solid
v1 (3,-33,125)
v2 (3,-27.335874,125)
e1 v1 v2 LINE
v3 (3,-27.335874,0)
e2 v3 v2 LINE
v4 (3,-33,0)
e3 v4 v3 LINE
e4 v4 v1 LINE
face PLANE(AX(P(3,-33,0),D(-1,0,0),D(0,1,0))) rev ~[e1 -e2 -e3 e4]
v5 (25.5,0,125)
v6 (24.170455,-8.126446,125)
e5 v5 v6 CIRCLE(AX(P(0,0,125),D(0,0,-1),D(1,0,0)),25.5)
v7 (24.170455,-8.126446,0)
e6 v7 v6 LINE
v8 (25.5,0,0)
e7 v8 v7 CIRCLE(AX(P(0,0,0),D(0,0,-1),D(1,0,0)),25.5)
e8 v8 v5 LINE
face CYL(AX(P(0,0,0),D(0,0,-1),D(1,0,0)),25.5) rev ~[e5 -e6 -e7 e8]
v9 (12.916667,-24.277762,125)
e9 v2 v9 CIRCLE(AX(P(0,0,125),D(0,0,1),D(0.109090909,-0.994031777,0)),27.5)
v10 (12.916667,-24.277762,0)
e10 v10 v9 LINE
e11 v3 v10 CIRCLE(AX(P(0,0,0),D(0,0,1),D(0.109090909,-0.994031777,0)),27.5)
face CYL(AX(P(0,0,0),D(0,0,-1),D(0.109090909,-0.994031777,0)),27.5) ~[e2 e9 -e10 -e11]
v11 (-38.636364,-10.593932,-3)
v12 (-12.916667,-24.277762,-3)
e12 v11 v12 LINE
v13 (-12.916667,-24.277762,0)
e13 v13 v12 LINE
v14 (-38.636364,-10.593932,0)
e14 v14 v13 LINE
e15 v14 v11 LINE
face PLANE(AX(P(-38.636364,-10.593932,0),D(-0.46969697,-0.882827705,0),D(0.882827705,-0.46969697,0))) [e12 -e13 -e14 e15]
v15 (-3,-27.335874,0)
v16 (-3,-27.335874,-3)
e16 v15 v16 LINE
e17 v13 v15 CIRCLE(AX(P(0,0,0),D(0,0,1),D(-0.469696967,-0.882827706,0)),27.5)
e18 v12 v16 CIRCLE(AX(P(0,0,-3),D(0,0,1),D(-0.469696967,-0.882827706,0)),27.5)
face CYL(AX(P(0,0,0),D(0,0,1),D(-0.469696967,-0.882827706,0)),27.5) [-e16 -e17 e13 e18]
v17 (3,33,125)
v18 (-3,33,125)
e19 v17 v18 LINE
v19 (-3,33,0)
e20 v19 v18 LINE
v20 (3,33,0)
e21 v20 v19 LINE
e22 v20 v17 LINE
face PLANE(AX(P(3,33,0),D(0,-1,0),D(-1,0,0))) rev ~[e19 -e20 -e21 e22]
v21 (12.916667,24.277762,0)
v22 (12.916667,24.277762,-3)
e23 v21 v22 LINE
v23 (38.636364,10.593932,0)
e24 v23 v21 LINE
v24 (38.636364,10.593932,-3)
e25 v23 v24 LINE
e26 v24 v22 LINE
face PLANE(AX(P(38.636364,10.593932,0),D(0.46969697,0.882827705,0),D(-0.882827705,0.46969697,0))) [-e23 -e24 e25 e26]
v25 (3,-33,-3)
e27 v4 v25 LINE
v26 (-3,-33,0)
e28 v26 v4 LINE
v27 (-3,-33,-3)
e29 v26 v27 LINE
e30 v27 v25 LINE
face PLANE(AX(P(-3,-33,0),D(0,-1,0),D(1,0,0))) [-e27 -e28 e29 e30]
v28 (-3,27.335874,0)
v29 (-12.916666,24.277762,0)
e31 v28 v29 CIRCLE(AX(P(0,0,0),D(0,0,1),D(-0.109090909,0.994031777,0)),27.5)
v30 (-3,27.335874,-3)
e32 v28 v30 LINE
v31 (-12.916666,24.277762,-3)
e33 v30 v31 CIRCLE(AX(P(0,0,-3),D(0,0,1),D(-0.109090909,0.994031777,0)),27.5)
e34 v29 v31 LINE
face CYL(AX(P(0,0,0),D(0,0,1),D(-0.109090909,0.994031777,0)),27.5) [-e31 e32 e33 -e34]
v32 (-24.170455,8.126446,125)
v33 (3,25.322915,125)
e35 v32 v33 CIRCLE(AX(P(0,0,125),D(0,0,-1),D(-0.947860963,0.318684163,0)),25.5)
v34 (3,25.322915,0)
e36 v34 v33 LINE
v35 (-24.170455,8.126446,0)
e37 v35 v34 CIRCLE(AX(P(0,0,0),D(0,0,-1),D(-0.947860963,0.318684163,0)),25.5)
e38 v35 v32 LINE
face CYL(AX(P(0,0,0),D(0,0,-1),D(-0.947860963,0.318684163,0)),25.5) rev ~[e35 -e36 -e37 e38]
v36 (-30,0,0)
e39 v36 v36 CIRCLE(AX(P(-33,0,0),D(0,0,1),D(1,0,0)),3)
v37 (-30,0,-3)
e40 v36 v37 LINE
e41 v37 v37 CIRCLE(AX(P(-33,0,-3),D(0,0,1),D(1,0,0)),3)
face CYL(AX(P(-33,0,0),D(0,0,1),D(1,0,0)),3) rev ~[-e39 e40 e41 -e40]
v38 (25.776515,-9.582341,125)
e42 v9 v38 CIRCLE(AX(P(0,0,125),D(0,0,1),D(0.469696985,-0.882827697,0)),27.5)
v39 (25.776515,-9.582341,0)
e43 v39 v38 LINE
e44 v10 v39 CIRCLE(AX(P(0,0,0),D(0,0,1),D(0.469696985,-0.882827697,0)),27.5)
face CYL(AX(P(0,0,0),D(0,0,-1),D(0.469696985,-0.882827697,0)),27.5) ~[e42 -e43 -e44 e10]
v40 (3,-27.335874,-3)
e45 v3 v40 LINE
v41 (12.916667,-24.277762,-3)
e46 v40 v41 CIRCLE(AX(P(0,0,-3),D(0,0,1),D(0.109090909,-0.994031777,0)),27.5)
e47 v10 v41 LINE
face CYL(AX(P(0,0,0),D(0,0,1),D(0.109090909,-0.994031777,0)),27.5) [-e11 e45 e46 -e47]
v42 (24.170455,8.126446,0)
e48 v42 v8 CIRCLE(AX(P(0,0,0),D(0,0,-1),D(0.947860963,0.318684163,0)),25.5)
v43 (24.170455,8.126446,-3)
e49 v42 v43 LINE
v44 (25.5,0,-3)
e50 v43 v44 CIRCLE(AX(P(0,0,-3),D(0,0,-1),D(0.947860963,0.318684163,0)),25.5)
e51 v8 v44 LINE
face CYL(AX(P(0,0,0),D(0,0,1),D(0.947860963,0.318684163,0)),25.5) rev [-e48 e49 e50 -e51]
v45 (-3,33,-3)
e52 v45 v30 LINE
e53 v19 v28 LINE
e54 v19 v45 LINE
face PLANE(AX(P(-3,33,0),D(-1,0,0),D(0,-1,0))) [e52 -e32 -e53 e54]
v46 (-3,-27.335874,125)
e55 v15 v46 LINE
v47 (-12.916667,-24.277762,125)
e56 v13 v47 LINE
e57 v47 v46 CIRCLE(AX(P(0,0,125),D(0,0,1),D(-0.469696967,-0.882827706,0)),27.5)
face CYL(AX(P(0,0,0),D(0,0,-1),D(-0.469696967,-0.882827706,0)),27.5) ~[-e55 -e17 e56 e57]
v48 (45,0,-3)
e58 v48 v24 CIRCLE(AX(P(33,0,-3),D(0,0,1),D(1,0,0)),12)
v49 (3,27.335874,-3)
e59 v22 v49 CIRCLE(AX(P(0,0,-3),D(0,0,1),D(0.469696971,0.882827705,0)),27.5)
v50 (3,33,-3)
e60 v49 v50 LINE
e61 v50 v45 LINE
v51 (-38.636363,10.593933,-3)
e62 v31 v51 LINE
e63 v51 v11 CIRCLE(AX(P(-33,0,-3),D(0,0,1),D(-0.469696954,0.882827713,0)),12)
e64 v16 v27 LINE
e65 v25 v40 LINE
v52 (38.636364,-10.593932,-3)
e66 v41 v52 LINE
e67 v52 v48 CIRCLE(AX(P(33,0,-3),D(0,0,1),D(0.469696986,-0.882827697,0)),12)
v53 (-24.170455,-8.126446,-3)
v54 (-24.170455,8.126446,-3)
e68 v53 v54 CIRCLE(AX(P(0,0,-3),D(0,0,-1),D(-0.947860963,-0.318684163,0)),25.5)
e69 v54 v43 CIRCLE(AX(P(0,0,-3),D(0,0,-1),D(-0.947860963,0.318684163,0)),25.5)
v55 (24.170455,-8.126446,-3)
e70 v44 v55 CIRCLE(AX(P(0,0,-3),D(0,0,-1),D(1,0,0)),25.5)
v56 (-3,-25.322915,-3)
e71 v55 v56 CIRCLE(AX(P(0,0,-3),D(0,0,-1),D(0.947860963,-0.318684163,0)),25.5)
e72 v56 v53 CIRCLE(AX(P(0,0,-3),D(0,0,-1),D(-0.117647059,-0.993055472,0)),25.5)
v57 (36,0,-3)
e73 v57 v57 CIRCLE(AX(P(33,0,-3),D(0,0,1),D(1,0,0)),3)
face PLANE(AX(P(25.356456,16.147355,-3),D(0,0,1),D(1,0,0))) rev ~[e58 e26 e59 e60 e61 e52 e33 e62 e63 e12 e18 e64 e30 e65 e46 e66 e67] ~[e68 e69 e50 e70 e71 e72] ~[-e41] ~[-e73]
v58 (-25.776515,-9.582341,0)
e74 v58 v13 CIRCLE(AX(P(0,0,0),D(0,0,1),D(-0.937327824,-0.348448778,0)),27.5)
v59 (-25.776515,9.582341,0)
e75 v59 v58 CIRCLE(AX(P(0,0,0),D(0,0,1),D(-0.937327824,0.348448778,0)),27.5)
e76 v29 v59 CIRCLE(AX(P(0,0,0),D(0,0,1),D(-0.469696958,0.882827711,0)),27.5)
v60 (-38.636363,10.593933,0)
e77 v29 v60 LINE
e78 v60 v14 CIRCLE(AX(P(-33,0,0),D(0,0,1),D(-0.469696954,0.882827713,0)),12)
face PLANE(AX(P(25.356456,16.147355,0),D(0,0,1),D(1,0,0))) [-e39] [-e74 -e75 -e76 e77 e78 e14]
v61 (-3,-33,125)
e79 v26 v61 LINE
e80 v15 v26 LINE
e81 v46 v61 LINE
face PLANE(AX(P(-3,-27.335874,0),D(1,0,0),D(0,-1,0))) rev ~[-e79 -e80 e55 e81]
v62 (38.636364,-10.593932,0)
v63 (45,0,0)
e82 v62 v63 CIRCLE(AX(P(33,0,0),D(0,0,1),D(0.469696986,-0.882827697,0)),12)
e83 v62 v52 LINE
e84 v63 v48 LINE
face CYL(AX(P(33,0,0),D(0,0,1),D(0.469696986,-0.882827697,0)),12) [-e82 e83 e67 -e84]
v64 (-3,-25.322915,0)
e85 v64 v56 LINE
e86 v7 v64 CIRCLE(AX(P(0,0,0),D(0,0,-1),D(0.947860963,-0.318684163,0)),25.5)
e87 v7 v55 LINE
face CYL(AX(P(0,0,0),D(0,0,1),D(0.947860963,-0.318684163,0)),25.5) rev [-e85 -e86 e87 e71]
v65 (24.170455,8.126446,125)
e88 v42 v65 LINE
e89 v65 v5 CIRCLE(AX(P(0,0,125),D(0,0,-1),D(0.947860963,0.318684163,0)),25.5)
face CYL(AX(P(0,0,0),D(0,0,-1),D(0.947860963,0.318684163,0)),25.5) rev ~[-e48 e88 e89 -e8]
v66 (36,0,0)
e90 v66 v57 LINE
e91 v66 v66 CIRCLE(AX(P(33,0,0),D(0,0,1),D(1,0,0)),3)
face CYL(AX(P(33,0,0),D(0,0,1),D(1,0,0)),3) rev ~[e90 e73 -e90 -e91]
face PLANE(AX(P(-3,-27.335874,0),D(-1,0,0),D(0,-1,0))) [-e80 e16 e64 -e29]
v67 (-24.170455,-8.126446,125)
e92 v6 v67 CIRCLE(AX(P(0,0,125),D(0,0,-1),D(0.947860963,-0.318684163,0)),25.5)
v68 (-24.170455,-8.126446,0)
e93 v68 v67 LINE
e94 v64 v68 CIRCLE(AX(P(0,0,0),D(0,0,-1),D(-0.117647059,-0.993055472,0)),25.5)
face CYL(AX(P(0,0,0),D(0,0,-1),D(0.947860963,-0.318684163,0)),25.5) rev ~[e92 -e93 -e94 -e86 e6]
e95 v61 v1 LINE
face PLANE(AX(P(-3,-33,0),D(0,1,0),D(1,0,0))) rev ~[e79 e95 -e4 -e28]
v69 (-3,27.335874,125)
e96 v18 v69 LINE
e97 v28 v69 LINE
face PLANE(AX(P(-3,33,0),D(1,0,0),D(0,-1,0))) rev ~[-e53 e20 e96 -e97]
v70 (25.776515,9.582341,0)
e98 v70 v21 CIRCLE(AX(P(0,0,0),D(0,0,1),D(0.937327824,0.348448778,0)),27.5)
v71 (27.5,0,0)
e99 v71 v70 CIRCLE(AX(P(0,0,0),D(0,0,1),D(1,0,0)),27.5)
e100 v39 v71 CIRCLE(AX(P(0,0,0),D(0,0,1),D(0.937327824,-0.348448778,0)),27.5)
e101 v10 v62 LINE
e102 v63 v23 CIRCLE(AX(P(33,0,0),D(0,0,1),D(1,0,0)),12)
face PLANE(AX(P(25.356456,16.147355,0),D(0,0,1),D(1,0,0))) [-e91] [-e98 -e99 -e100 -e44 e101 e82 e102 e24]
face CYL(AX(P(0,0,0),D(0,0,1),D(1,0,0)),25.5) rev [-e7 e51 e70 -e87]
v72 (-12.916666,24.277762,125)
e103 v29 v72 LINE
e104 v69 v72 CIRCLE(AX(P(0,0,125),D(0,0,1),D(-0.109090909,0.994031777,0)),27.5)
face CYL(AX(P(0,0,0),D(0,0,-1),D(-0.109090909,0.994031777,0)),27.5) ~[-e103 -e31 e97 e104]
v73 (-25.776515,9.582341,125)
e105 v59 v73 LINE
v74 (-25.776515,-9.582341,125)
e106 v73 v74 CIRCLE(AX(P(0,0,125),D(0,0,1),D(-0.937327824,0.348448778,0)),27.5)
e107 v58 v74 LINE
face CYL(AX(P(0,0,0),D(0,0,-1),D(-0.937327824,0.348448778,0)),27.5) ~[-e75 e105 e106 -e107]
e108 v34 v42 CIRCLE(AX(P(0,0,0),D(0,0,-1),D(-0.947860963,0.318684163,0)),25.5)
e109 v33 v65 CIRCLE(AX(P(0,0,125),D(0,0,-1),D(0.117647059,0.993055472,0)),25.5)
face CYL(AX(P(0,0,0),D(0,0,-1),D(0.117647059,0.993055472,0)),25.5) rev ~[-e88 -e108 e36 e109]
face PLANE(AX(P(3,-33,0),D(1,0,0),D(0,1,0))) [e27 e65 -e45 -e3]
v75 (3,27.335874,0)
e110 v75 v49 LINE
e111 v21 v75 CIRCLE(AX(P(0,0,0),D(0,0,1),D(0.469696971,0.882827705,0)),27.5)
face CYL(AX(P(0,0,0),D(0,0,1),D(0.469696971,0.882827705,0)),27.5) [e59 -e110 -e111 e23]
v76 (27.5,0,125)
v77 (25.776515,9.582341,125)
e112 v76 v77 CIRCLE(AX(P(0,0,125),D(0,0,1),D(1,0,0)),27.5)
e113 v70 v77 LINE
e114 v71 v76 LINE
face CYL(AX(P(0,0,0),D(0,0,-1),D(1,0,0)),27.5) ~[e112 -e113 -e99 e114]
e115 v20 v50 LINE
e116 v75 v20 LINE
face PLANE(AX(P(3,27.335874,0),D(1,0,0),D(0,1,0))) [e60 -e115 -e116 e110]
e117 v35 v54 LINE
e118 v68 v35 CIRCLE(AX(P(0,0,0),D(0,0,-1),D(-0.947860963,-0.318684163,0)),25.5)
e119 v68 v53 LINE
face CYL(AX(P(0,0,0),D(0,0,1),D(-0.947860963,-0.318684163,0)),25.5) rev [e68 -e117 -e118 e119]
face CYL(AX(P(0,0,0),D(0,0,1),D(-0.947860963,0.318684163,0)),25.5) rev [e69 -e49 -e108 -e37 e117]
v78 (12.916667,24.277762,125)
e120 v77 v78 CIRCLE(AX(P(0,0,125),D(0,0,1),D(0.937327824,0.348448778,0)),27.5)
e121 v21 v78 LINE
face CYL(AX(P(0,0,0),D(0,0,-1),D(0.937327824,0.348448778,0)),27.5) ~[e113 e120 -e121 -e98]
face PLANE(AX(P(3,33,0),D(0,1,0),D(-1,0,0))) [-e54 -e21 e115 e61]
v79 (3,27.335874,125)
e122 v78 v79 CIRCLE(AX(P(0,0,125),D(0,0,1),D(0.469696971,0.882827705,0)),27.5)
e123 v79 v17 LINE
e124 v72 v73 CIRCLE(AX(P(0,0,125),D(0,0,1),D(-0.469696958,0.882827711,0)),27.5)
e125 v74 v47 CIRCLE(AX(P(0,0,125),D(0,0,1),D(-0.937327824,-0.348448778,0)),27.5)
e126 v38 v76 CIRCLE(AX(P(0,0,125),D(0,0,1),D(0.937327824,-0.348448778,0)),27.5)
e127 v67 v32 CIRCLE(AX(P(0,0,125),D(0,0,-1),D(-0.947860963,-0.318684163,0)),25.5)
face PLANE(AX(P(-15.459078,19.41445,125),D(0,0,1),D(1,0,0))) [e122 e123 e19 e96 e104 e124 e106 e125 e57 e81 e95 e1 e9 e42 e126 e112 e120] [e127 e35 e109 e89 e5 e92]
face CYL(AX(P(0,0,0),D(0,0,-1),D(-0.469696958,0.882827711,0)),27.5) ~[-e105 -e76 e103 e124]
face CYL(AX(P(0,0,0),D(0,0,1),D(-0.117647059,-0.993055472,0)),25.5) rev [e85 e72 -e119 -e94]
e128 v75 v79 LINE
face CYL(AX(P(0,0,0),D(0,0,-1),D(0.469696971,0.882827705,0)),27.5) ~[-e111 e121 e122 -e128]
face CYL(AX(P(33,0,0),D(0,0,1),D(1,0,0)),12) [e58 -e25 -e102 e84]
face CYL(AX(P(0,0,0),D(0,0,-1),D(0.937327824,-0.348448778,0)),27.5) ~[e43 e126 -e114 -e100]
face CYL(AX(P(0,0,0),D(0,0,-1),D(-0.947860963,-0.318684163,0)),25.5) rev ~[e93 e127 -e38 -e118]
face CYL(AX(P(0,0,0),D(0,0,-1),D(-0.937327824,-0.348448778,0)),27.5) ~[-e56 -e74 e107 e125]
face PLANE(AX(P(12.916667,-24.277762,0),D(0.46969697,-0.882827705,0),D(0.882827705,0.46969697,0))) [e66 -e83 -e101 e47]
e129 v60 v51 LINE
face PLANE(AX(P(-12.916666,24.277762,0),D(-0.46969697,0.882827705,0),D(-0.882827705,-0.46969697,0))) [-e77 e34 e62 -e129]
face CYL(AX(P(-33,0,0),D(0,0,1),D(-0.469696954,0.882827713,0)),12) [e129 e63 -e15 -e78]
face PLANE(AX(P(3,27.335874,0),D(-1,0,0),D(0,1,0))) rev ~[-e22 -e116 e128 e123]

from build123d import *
from build123d import SkipClean  # not in build123d's __all__

# Parameters (mm, degrees)
F0_R     = 3
F1_DEPTH = 3
F2_DEPTH = 125


# Not quite as in the source:
# - a feature names something its author has since deleted; it is built from what else it names


with BuildPart() as f1:
    # F0 (on Top) → F1 (new body)
    with BuildSketch(Plane.XY):
        with BuildLine():
            ThreePointArc((12.9166666896, 24.2777618744), (20.6949130465, 18.1099578685), (25.7765151515, 9.5823413967))
            ThreePointArc((25.7765151515, 9.5823413967), (32.0589540907, 11.9630444535), (38.6363637791, 10.5939323837))
            Line((38.6363637791, 10.5939323837), (12.9166666896, 24.2777618744))
        make_face()
        with BuildLine():
            ThreePointArc((25.7765151515, 9.5823413967), (27.0656993875, 4.8680506023), (27.5, 0))
            ThreePointArc((27.5, 0), (27.0656993875, -4.8680506023), (25.7765151515, -9.5823413967))
            ThreePointArc((25.7765151515, -9.5823413967), (32.0589541175, -11.9630444556), (38.6363638266, -10.5939323584))
            ThreePointArc((38.6363638266, -10.5939323584), (43.2867965353, -6.1791437142), (45, 0))
            ThreePointArc((45, 0), (43.2867965215, 6.1791437372), (38.6363637791, 10.5939323837))
            ThreePointArc((38.6363637791, 10.5939323837), (32.0589540907, 11.9630444535), (25.7765151515, 9.5823413967))
        make_face()
        with Locations((33, 0)):
            Circle(F0_R, mode=Mode.SUBTRACT)
        with BuildLine():
            ThreePointArc((25.7765151515, -9.5823413967), (27.0656993875, -4.8680506023), (27.5, 0))
            ThreePointArc((27.5, 0), (27.0656993875, 4.8680506023), (25.7765151515, 9.5823413967))
            ThreePointArc((25.7765151515, 9.5823413967), (24.9405426226, 8.8907337595), (24.1704545455, 8.1264461523))
            ThreePointArc((24.1704545455, 8.1264461523), (25.1654186425, 4.117244776), (25.5, 0))
            ThreePointArc((25.5, 0), (25.1654186425, -4.117244776), (24.1704545455, -8.1264461523))
            ThreePointArc((24.1704545455, -8.1264461523), (24.9405426226, -8.8907337595), (25.7765151515, -9.5823413967))
        make_face()
        with BuildLine():
            ThreePointArc((-3, 27.3358738657), (0, 27.5), (3, 27.3358738657))
            Line((3, 27.3358738657), (3, 33))
            Line((3, 33), (-3, 33))
            Line((-3, 33), (-3, 27.3358738657))
        make_face()
        with BuildLine():
            ThreePointArc((38.6363638266, -10.5939323584), (32.0589541175, -11.9630444556), (25.7765151515, -9.5823413967))
            ThreePointArc((25.7765151515, -9.5823413967), (20.6949131964, -18.1099576972), (12.9166670915, -24.2777616606))
            Line((12.9166670915, -24.2777616606), (38.6363638266, -10.5939323584))
        make_face()
        with BuildLine():
            ThreePointArc((-25.7765151515, 9.5823413967), (-20.6949129227, 18.1099580099), (-12.9166663578, 24.2777620509))
            Line((-12.9166663578, 24.2777620509), (-38.636363452, 10.5939325577))
            ThreePointArc((-38.636363452, 10.5939325577), (-32.058953906, 11.963044439), (-25.7765151515, 9.5823413967))
        make_face()
        with BuildLine():
            ThreePointArc((-25.7765151515, -9.5823413967), (-27.5, 0), (-25.7765151515, 9.5823413967))
            ThreePointArc((-25.7765151515, 9.5823413967), (-32.058953906, 11.963044439), (-38.636363452, 10.5939325577))
            ThreePointArc((-38.636363452, 10.5939325577), (-45, 1.496e-07), (-38.6363637162, -10.5939324171))
            ThreePointArc((-38.6363637162, -10.5939324171), (-32.0589540552, -11.9630444507), (-25.7765151515, -9.5823413967))
        make_face()
        with Locations((-33, 0)):
            Circle(F0_R, mode=Mode.SUBTRACT)
        with BuildLine():
            ThreePointArc((-24.1704545455, -8.1264461523), (-25.5, 0), (-24.1704545455, 8.1264461523))
            ThreePointArc((-24.1704545455, 8.1264461523), (-24.9405426226, 8.8907337595), (-25.7765151515, 9.5823413967))
            ThreePointArc((-25.7765151515, 9.5823413967), (-27.5, 0), (-25.7765151515, -9.5823413967))
            ThreePointArc((-25.7765151515, -9.5823413967), (-24.9405426226, -8.8907337595), (-24.1704545455, -8.1264461523))
        make_face()
        with BuildLine():
            Line((-38.6363637162, -10.5939324171), (-12.9166665881, -24.2777619284))
            ThreePointArc((-12.9166665881, -24.2777619284), (-20.6949130086, -18.1099579118), (-25.7765151515, -9.5823413967))
            ThreePointArc((-25.7765151515, -9.5823413967), (-32.0589540552, -11.9630444507), (-38.6363637162, -10.5939324171))
        make_face()
        with BuildLine():
            Line((3, 25.3229145242), (3, 27.3358738657))
            ThreePointArc((3, 27.3358738657), (0, 27.5), (-3, 27.3358738657))
            Line((-3, 27.3358738657), (-3, 25.3229145242))
            ThreePointArc((-3, 25.3229145242), (0, 25.5), (3, 25.3229145242))
        make_face()
        with BuildLine():
            ThreePointArc((24.1704545455, 8.1264461523), (24.9405426226, 8.8907337595), (25.7765151515, 9.5823413967))
            ThreePointArc((25.7765151515, 9.5823413967), (20.6949130465, 18.1099578685), (12.9166666896, 24.2777618744))
            ThreePointArc((12.9166666896, 24.2777618744), (8.1038930067, 26.2788302277), (3, 27.3358738657))
            Line((3, 27.3358738657), (3, 25.3229145242))
            ThreePointArc((3, 25.3229145242), (16.0775629735, 19.7929777657), (24.1704545455, 8.1264461523))
        make_face()
        with BuildLine():
            Line((-3, 25.3229145242), (-3, 27.3358738657))
            ThreePointArc((-3, 27.3358738657), (-8.1038928272, 26.2788302831), (-12.9166663578, 24.2777620509))
            ThreePointArc((-12.9166663578, 24.2777620509), (-20.6949129227, 18.1099580099), (-25.7765151515, 9.5823413967))
            ThreePointArc((-25.7765151515, 9.5823413967), (-24.9405426226, 8.8907337595), (-24.1704545455, 8.1264461523))
            ThreePointArc((-24.1704545455, 8.1264461523), (-16.0775629735, 19.7929777657), (-3, 25.3229145242))
        make_face()
        with BuildLine():
            ThreePointArc((-3, -27.3358738657), (0, -27.5), (3, -27.3358738657))
            Line((3, -27.3358738657), (3, -25.3229145242))
            ThreePointArc((3, -25.3229145242), (0, -25.5), (-3, -25.3229145242))
            Line((-3, -25.3229145242), (-3, -27.3358738657))
        make_face()
        with BuildLine():
            Line((3, -33), (3, -27.3358738657))
            ThreePointArc((3, -27.3358738657), (0, -27.5), (-3, -27.3358738657))
            Line((-3, -27.3358738657), (-3, -33))
            Line((-3, -33), (3, -33))
        make_face()
        with BuildLine():
            ThreePointArc((12.9166670915, -24.2777616606), (20.6949131964, -18.1099576972), (25.7765151515, -9.5823413967))
            ThreePointArc((25.7765151515, -9.5823413967), (24.9405426226, -8.8907337595), (24.1704545455, -8.1264461523))
            ThreePointArc((24.1704545455, -8.1264461523), (16.0775629735, -19.7929777657), (3, -25.3229145242))
            Line((3, -25.3229145242), (3, -27.3358738657))
            ThreePointArc((3, -27.3358738657), (8.1038932243, -26.2788301606), (12.9166670915, -24.2777616606))
        make_face()
        with BuildLine():
            ThreePointArc((-12.9166665881, -24.2777619284), (-8.1038929518, -26.2788302446), (-3, -27.3358738657))
            Line((-3, -27.3358738657), (-3, -25.3229145242))
            ThreePointArc((-3, -25.3229145242), (-16.0775629735, -19.7929777657), (-24.1704545455, -8.1264461523))
            ThreePointArc((-24.1704545455, -8.1264461523), (-24.9405426226, -8.8907337595), (-25.7765151515, -9.5823413967))
            ThreePointArc((-25.7765151515, -9.5823413967), (-20.6949130086, -18.1099579118), (-12.9166665881, -24.2777619284))
        make_face()
    extrude(amount=-F1_DEPTH)

    # F0 (on Top) → F2 (join)
    with BuildSketch(Plane.XY):
        with BuildLine():
            Line((-3, 25.3229145242), (-3, 27.3358738657))
            ThreePointArc((-3, 27.3358738657), (-8.1038928272, 26.2788302831), (-12.9166663578, 24.2777620509))
            ThreePointArc((-12.9166663578, 24.2777620509), (-20.6949129227, 18.1099580099), (-25.7765151515, 9.5823413967))
            ThreePointArc((-25.7765151515, 9.5823413967), (-24.9405426226, 8.8907337595), (-24.1704545455, 8.1264461523))
            ThreePointArc((-24.1704545455, 8.1264461523), (-16.0775629735, 19.7929777657), (-3, 25.3229145242))
        make_face()
        with BuildLine():
            ThreePointArc((-3, 27.3358738657), (0, 27.5), (3, 27.3358738657))
            Line((3, 27.3358738657), (3, 33))
            Line((3, 33), (-3, 33))
            Line((-3, 33), (-3, 27.3358738657))
        make_face()
        with BuildLine():
            Line((3, 25.3229145242), (3, 27.3358738657))
            ThreePointArc((3, 27.3358738657), (0, 27.5), (-3, 27.3358738657))
            Line((-3, 27.3358738657), (-3, 25.3229145242))
            ThreePointArc((-3, 25.3229145242), (0, 25.5), (3, 25.3229145242))
        make_face()
        with BuildLine():
            ThreePointArc((24.1704545455, 8.1264461523), (24.9405426226, 8.8907337595), (25.7765151515, 9.5823413967))
            ThreePointArc((25.7765151515, 9.5823413967), (20.6949130465, 18.1099578685), (12.9166666896, 24.2777618744))
            ThreePointArc((12.9166666896, 24.2777618744), (8.1038930067, 26.2788302277), (3, 27.3358738657))
            Line((3, 27.3358738657), (3, 25.3229145242))
            ThreePointArc((3, 25.3229145242), (16.0775629735, 19.7929777657), (24.1704545455, 8.1264461523))
        make_face()
        with BuildLine():
            Line((3, -33), (3, -27.3358738657))
            ThreePointArc((3, -27.3358738657), (0, -27.5), (-3, -27.3358738657))
            Line((-3, -27.3358738657), (-3, -33))
            Line((-3, -33), (3, -33))
        make_face()
        with BuildLine():
            ThreePointArc((-24.1704545455, -8.1264461523), (-25.5, 0), (-24.1704545455, 8.1264461523))
            ThreePointArc((-24.1704545455, 8.1264461523), (-24.9405426226, 8.8907337595), (-25.7765151515, 9.5823413967))
            ThreePointArc((-25.7765151515, 9.5823413967), (-27.5, 0), (-25.7765151515, -9.5823413967))
            ThreePointArc((-25.7765151515, -9.5823413967), (-24.9405426226, -8.8907337595), (-24.1704545455, -8.1264461523))
        make_face()
        with BuildLine():
            ThreePointArc((25.7765151515, -9.5823413967), (27.0656993875, -4.8680506023), (27.5, 0))
            ThreePointArc((27.5, 0), (27.0656993875, 4.8680506023), (25.7765151515, 9.5823413967))
            ThreePointArc((25.7765151515, 9.5823413967), (24.9405426226, 8.8907337595), (24.1704545455, 8.1264461523))
            ThreePointArc((24.1704545455, 8.1264461523), (25.1654186425, 4.117244776), (25.5, 0))
            ThreePointArc((25.5, 0), (25.1654186425, -4.117244776), (24.1704545455, -8.1264461523))
            ThreePointArc((24.1704545455, -8.1264461523), (24.9405426226, -8.8907337595), (25.7765151515, -9.5823413967))
        make_face()
        with BuildLine():
            ThreePointArc((-3, -27.3358738657), (0, -27.5), (3, -27.3358738657))
            Line((3, -27.3358738657), (3, -25.3229145242))
            ThreePointArc((3, -25.3229145242), (0, -25.5), (-3, -25.3229145242))
            Line((-3, -25.3229145242), (-3, -27.3358738657))
        make_face()
        with BuildLine():
            ThreePointArc((-12.9166665881, -24.2777619284), (-8.1038929518, -26.2788302446), (-3, -27.3358738657))
            Line((-3, -27.3358738657), (-3, -25.3229145242))
            ThreePointArc((-3, -25.3229145242), (-16.0775629735, -19.7929777657), (-24.1704545455, -8.1264461523))
            ThreePointArc((-24.1704545455, -8.1264461523), (-24.9405426226, -8.8907337595), (-25.7765151515, -9.5823413967))
            ThreePointArc((-25.7765151515, -9.5823413967), (-20.6949130086, -18.1099579118), (-12.9166665881, -24.2777619284))
        make_face()
        with BuildLine():
            ThreePointArc((12.9166670915, -24.2777616606), (20.6949131964, -18.1099576972), (25.7765151515, -9.5823413967))
            ThreePointArc((25.7765151515, -9.5823413967), (24.9405426226, -8.8907337595), (24.1704545455, -8.1264461523))
            ThreePointArc((24.1704545455, -8.1264461523), (16.0775629735, -19.7929777657), (3, -25.3229145242))
            Line((3, -25.3229145242), (3, -27.3358738657))
            ThreePointArc((3, -27.3358738657), (8.1038932243, -26.2788301606), (12.9166670915, -24.2777616606))
        make_face()
    with SkipClean():  # cleaning this boolean's faces spoils the solid; the shape is the same uncleaned
        extrude(amount=F2_DEPTH)


solid = f1.part
